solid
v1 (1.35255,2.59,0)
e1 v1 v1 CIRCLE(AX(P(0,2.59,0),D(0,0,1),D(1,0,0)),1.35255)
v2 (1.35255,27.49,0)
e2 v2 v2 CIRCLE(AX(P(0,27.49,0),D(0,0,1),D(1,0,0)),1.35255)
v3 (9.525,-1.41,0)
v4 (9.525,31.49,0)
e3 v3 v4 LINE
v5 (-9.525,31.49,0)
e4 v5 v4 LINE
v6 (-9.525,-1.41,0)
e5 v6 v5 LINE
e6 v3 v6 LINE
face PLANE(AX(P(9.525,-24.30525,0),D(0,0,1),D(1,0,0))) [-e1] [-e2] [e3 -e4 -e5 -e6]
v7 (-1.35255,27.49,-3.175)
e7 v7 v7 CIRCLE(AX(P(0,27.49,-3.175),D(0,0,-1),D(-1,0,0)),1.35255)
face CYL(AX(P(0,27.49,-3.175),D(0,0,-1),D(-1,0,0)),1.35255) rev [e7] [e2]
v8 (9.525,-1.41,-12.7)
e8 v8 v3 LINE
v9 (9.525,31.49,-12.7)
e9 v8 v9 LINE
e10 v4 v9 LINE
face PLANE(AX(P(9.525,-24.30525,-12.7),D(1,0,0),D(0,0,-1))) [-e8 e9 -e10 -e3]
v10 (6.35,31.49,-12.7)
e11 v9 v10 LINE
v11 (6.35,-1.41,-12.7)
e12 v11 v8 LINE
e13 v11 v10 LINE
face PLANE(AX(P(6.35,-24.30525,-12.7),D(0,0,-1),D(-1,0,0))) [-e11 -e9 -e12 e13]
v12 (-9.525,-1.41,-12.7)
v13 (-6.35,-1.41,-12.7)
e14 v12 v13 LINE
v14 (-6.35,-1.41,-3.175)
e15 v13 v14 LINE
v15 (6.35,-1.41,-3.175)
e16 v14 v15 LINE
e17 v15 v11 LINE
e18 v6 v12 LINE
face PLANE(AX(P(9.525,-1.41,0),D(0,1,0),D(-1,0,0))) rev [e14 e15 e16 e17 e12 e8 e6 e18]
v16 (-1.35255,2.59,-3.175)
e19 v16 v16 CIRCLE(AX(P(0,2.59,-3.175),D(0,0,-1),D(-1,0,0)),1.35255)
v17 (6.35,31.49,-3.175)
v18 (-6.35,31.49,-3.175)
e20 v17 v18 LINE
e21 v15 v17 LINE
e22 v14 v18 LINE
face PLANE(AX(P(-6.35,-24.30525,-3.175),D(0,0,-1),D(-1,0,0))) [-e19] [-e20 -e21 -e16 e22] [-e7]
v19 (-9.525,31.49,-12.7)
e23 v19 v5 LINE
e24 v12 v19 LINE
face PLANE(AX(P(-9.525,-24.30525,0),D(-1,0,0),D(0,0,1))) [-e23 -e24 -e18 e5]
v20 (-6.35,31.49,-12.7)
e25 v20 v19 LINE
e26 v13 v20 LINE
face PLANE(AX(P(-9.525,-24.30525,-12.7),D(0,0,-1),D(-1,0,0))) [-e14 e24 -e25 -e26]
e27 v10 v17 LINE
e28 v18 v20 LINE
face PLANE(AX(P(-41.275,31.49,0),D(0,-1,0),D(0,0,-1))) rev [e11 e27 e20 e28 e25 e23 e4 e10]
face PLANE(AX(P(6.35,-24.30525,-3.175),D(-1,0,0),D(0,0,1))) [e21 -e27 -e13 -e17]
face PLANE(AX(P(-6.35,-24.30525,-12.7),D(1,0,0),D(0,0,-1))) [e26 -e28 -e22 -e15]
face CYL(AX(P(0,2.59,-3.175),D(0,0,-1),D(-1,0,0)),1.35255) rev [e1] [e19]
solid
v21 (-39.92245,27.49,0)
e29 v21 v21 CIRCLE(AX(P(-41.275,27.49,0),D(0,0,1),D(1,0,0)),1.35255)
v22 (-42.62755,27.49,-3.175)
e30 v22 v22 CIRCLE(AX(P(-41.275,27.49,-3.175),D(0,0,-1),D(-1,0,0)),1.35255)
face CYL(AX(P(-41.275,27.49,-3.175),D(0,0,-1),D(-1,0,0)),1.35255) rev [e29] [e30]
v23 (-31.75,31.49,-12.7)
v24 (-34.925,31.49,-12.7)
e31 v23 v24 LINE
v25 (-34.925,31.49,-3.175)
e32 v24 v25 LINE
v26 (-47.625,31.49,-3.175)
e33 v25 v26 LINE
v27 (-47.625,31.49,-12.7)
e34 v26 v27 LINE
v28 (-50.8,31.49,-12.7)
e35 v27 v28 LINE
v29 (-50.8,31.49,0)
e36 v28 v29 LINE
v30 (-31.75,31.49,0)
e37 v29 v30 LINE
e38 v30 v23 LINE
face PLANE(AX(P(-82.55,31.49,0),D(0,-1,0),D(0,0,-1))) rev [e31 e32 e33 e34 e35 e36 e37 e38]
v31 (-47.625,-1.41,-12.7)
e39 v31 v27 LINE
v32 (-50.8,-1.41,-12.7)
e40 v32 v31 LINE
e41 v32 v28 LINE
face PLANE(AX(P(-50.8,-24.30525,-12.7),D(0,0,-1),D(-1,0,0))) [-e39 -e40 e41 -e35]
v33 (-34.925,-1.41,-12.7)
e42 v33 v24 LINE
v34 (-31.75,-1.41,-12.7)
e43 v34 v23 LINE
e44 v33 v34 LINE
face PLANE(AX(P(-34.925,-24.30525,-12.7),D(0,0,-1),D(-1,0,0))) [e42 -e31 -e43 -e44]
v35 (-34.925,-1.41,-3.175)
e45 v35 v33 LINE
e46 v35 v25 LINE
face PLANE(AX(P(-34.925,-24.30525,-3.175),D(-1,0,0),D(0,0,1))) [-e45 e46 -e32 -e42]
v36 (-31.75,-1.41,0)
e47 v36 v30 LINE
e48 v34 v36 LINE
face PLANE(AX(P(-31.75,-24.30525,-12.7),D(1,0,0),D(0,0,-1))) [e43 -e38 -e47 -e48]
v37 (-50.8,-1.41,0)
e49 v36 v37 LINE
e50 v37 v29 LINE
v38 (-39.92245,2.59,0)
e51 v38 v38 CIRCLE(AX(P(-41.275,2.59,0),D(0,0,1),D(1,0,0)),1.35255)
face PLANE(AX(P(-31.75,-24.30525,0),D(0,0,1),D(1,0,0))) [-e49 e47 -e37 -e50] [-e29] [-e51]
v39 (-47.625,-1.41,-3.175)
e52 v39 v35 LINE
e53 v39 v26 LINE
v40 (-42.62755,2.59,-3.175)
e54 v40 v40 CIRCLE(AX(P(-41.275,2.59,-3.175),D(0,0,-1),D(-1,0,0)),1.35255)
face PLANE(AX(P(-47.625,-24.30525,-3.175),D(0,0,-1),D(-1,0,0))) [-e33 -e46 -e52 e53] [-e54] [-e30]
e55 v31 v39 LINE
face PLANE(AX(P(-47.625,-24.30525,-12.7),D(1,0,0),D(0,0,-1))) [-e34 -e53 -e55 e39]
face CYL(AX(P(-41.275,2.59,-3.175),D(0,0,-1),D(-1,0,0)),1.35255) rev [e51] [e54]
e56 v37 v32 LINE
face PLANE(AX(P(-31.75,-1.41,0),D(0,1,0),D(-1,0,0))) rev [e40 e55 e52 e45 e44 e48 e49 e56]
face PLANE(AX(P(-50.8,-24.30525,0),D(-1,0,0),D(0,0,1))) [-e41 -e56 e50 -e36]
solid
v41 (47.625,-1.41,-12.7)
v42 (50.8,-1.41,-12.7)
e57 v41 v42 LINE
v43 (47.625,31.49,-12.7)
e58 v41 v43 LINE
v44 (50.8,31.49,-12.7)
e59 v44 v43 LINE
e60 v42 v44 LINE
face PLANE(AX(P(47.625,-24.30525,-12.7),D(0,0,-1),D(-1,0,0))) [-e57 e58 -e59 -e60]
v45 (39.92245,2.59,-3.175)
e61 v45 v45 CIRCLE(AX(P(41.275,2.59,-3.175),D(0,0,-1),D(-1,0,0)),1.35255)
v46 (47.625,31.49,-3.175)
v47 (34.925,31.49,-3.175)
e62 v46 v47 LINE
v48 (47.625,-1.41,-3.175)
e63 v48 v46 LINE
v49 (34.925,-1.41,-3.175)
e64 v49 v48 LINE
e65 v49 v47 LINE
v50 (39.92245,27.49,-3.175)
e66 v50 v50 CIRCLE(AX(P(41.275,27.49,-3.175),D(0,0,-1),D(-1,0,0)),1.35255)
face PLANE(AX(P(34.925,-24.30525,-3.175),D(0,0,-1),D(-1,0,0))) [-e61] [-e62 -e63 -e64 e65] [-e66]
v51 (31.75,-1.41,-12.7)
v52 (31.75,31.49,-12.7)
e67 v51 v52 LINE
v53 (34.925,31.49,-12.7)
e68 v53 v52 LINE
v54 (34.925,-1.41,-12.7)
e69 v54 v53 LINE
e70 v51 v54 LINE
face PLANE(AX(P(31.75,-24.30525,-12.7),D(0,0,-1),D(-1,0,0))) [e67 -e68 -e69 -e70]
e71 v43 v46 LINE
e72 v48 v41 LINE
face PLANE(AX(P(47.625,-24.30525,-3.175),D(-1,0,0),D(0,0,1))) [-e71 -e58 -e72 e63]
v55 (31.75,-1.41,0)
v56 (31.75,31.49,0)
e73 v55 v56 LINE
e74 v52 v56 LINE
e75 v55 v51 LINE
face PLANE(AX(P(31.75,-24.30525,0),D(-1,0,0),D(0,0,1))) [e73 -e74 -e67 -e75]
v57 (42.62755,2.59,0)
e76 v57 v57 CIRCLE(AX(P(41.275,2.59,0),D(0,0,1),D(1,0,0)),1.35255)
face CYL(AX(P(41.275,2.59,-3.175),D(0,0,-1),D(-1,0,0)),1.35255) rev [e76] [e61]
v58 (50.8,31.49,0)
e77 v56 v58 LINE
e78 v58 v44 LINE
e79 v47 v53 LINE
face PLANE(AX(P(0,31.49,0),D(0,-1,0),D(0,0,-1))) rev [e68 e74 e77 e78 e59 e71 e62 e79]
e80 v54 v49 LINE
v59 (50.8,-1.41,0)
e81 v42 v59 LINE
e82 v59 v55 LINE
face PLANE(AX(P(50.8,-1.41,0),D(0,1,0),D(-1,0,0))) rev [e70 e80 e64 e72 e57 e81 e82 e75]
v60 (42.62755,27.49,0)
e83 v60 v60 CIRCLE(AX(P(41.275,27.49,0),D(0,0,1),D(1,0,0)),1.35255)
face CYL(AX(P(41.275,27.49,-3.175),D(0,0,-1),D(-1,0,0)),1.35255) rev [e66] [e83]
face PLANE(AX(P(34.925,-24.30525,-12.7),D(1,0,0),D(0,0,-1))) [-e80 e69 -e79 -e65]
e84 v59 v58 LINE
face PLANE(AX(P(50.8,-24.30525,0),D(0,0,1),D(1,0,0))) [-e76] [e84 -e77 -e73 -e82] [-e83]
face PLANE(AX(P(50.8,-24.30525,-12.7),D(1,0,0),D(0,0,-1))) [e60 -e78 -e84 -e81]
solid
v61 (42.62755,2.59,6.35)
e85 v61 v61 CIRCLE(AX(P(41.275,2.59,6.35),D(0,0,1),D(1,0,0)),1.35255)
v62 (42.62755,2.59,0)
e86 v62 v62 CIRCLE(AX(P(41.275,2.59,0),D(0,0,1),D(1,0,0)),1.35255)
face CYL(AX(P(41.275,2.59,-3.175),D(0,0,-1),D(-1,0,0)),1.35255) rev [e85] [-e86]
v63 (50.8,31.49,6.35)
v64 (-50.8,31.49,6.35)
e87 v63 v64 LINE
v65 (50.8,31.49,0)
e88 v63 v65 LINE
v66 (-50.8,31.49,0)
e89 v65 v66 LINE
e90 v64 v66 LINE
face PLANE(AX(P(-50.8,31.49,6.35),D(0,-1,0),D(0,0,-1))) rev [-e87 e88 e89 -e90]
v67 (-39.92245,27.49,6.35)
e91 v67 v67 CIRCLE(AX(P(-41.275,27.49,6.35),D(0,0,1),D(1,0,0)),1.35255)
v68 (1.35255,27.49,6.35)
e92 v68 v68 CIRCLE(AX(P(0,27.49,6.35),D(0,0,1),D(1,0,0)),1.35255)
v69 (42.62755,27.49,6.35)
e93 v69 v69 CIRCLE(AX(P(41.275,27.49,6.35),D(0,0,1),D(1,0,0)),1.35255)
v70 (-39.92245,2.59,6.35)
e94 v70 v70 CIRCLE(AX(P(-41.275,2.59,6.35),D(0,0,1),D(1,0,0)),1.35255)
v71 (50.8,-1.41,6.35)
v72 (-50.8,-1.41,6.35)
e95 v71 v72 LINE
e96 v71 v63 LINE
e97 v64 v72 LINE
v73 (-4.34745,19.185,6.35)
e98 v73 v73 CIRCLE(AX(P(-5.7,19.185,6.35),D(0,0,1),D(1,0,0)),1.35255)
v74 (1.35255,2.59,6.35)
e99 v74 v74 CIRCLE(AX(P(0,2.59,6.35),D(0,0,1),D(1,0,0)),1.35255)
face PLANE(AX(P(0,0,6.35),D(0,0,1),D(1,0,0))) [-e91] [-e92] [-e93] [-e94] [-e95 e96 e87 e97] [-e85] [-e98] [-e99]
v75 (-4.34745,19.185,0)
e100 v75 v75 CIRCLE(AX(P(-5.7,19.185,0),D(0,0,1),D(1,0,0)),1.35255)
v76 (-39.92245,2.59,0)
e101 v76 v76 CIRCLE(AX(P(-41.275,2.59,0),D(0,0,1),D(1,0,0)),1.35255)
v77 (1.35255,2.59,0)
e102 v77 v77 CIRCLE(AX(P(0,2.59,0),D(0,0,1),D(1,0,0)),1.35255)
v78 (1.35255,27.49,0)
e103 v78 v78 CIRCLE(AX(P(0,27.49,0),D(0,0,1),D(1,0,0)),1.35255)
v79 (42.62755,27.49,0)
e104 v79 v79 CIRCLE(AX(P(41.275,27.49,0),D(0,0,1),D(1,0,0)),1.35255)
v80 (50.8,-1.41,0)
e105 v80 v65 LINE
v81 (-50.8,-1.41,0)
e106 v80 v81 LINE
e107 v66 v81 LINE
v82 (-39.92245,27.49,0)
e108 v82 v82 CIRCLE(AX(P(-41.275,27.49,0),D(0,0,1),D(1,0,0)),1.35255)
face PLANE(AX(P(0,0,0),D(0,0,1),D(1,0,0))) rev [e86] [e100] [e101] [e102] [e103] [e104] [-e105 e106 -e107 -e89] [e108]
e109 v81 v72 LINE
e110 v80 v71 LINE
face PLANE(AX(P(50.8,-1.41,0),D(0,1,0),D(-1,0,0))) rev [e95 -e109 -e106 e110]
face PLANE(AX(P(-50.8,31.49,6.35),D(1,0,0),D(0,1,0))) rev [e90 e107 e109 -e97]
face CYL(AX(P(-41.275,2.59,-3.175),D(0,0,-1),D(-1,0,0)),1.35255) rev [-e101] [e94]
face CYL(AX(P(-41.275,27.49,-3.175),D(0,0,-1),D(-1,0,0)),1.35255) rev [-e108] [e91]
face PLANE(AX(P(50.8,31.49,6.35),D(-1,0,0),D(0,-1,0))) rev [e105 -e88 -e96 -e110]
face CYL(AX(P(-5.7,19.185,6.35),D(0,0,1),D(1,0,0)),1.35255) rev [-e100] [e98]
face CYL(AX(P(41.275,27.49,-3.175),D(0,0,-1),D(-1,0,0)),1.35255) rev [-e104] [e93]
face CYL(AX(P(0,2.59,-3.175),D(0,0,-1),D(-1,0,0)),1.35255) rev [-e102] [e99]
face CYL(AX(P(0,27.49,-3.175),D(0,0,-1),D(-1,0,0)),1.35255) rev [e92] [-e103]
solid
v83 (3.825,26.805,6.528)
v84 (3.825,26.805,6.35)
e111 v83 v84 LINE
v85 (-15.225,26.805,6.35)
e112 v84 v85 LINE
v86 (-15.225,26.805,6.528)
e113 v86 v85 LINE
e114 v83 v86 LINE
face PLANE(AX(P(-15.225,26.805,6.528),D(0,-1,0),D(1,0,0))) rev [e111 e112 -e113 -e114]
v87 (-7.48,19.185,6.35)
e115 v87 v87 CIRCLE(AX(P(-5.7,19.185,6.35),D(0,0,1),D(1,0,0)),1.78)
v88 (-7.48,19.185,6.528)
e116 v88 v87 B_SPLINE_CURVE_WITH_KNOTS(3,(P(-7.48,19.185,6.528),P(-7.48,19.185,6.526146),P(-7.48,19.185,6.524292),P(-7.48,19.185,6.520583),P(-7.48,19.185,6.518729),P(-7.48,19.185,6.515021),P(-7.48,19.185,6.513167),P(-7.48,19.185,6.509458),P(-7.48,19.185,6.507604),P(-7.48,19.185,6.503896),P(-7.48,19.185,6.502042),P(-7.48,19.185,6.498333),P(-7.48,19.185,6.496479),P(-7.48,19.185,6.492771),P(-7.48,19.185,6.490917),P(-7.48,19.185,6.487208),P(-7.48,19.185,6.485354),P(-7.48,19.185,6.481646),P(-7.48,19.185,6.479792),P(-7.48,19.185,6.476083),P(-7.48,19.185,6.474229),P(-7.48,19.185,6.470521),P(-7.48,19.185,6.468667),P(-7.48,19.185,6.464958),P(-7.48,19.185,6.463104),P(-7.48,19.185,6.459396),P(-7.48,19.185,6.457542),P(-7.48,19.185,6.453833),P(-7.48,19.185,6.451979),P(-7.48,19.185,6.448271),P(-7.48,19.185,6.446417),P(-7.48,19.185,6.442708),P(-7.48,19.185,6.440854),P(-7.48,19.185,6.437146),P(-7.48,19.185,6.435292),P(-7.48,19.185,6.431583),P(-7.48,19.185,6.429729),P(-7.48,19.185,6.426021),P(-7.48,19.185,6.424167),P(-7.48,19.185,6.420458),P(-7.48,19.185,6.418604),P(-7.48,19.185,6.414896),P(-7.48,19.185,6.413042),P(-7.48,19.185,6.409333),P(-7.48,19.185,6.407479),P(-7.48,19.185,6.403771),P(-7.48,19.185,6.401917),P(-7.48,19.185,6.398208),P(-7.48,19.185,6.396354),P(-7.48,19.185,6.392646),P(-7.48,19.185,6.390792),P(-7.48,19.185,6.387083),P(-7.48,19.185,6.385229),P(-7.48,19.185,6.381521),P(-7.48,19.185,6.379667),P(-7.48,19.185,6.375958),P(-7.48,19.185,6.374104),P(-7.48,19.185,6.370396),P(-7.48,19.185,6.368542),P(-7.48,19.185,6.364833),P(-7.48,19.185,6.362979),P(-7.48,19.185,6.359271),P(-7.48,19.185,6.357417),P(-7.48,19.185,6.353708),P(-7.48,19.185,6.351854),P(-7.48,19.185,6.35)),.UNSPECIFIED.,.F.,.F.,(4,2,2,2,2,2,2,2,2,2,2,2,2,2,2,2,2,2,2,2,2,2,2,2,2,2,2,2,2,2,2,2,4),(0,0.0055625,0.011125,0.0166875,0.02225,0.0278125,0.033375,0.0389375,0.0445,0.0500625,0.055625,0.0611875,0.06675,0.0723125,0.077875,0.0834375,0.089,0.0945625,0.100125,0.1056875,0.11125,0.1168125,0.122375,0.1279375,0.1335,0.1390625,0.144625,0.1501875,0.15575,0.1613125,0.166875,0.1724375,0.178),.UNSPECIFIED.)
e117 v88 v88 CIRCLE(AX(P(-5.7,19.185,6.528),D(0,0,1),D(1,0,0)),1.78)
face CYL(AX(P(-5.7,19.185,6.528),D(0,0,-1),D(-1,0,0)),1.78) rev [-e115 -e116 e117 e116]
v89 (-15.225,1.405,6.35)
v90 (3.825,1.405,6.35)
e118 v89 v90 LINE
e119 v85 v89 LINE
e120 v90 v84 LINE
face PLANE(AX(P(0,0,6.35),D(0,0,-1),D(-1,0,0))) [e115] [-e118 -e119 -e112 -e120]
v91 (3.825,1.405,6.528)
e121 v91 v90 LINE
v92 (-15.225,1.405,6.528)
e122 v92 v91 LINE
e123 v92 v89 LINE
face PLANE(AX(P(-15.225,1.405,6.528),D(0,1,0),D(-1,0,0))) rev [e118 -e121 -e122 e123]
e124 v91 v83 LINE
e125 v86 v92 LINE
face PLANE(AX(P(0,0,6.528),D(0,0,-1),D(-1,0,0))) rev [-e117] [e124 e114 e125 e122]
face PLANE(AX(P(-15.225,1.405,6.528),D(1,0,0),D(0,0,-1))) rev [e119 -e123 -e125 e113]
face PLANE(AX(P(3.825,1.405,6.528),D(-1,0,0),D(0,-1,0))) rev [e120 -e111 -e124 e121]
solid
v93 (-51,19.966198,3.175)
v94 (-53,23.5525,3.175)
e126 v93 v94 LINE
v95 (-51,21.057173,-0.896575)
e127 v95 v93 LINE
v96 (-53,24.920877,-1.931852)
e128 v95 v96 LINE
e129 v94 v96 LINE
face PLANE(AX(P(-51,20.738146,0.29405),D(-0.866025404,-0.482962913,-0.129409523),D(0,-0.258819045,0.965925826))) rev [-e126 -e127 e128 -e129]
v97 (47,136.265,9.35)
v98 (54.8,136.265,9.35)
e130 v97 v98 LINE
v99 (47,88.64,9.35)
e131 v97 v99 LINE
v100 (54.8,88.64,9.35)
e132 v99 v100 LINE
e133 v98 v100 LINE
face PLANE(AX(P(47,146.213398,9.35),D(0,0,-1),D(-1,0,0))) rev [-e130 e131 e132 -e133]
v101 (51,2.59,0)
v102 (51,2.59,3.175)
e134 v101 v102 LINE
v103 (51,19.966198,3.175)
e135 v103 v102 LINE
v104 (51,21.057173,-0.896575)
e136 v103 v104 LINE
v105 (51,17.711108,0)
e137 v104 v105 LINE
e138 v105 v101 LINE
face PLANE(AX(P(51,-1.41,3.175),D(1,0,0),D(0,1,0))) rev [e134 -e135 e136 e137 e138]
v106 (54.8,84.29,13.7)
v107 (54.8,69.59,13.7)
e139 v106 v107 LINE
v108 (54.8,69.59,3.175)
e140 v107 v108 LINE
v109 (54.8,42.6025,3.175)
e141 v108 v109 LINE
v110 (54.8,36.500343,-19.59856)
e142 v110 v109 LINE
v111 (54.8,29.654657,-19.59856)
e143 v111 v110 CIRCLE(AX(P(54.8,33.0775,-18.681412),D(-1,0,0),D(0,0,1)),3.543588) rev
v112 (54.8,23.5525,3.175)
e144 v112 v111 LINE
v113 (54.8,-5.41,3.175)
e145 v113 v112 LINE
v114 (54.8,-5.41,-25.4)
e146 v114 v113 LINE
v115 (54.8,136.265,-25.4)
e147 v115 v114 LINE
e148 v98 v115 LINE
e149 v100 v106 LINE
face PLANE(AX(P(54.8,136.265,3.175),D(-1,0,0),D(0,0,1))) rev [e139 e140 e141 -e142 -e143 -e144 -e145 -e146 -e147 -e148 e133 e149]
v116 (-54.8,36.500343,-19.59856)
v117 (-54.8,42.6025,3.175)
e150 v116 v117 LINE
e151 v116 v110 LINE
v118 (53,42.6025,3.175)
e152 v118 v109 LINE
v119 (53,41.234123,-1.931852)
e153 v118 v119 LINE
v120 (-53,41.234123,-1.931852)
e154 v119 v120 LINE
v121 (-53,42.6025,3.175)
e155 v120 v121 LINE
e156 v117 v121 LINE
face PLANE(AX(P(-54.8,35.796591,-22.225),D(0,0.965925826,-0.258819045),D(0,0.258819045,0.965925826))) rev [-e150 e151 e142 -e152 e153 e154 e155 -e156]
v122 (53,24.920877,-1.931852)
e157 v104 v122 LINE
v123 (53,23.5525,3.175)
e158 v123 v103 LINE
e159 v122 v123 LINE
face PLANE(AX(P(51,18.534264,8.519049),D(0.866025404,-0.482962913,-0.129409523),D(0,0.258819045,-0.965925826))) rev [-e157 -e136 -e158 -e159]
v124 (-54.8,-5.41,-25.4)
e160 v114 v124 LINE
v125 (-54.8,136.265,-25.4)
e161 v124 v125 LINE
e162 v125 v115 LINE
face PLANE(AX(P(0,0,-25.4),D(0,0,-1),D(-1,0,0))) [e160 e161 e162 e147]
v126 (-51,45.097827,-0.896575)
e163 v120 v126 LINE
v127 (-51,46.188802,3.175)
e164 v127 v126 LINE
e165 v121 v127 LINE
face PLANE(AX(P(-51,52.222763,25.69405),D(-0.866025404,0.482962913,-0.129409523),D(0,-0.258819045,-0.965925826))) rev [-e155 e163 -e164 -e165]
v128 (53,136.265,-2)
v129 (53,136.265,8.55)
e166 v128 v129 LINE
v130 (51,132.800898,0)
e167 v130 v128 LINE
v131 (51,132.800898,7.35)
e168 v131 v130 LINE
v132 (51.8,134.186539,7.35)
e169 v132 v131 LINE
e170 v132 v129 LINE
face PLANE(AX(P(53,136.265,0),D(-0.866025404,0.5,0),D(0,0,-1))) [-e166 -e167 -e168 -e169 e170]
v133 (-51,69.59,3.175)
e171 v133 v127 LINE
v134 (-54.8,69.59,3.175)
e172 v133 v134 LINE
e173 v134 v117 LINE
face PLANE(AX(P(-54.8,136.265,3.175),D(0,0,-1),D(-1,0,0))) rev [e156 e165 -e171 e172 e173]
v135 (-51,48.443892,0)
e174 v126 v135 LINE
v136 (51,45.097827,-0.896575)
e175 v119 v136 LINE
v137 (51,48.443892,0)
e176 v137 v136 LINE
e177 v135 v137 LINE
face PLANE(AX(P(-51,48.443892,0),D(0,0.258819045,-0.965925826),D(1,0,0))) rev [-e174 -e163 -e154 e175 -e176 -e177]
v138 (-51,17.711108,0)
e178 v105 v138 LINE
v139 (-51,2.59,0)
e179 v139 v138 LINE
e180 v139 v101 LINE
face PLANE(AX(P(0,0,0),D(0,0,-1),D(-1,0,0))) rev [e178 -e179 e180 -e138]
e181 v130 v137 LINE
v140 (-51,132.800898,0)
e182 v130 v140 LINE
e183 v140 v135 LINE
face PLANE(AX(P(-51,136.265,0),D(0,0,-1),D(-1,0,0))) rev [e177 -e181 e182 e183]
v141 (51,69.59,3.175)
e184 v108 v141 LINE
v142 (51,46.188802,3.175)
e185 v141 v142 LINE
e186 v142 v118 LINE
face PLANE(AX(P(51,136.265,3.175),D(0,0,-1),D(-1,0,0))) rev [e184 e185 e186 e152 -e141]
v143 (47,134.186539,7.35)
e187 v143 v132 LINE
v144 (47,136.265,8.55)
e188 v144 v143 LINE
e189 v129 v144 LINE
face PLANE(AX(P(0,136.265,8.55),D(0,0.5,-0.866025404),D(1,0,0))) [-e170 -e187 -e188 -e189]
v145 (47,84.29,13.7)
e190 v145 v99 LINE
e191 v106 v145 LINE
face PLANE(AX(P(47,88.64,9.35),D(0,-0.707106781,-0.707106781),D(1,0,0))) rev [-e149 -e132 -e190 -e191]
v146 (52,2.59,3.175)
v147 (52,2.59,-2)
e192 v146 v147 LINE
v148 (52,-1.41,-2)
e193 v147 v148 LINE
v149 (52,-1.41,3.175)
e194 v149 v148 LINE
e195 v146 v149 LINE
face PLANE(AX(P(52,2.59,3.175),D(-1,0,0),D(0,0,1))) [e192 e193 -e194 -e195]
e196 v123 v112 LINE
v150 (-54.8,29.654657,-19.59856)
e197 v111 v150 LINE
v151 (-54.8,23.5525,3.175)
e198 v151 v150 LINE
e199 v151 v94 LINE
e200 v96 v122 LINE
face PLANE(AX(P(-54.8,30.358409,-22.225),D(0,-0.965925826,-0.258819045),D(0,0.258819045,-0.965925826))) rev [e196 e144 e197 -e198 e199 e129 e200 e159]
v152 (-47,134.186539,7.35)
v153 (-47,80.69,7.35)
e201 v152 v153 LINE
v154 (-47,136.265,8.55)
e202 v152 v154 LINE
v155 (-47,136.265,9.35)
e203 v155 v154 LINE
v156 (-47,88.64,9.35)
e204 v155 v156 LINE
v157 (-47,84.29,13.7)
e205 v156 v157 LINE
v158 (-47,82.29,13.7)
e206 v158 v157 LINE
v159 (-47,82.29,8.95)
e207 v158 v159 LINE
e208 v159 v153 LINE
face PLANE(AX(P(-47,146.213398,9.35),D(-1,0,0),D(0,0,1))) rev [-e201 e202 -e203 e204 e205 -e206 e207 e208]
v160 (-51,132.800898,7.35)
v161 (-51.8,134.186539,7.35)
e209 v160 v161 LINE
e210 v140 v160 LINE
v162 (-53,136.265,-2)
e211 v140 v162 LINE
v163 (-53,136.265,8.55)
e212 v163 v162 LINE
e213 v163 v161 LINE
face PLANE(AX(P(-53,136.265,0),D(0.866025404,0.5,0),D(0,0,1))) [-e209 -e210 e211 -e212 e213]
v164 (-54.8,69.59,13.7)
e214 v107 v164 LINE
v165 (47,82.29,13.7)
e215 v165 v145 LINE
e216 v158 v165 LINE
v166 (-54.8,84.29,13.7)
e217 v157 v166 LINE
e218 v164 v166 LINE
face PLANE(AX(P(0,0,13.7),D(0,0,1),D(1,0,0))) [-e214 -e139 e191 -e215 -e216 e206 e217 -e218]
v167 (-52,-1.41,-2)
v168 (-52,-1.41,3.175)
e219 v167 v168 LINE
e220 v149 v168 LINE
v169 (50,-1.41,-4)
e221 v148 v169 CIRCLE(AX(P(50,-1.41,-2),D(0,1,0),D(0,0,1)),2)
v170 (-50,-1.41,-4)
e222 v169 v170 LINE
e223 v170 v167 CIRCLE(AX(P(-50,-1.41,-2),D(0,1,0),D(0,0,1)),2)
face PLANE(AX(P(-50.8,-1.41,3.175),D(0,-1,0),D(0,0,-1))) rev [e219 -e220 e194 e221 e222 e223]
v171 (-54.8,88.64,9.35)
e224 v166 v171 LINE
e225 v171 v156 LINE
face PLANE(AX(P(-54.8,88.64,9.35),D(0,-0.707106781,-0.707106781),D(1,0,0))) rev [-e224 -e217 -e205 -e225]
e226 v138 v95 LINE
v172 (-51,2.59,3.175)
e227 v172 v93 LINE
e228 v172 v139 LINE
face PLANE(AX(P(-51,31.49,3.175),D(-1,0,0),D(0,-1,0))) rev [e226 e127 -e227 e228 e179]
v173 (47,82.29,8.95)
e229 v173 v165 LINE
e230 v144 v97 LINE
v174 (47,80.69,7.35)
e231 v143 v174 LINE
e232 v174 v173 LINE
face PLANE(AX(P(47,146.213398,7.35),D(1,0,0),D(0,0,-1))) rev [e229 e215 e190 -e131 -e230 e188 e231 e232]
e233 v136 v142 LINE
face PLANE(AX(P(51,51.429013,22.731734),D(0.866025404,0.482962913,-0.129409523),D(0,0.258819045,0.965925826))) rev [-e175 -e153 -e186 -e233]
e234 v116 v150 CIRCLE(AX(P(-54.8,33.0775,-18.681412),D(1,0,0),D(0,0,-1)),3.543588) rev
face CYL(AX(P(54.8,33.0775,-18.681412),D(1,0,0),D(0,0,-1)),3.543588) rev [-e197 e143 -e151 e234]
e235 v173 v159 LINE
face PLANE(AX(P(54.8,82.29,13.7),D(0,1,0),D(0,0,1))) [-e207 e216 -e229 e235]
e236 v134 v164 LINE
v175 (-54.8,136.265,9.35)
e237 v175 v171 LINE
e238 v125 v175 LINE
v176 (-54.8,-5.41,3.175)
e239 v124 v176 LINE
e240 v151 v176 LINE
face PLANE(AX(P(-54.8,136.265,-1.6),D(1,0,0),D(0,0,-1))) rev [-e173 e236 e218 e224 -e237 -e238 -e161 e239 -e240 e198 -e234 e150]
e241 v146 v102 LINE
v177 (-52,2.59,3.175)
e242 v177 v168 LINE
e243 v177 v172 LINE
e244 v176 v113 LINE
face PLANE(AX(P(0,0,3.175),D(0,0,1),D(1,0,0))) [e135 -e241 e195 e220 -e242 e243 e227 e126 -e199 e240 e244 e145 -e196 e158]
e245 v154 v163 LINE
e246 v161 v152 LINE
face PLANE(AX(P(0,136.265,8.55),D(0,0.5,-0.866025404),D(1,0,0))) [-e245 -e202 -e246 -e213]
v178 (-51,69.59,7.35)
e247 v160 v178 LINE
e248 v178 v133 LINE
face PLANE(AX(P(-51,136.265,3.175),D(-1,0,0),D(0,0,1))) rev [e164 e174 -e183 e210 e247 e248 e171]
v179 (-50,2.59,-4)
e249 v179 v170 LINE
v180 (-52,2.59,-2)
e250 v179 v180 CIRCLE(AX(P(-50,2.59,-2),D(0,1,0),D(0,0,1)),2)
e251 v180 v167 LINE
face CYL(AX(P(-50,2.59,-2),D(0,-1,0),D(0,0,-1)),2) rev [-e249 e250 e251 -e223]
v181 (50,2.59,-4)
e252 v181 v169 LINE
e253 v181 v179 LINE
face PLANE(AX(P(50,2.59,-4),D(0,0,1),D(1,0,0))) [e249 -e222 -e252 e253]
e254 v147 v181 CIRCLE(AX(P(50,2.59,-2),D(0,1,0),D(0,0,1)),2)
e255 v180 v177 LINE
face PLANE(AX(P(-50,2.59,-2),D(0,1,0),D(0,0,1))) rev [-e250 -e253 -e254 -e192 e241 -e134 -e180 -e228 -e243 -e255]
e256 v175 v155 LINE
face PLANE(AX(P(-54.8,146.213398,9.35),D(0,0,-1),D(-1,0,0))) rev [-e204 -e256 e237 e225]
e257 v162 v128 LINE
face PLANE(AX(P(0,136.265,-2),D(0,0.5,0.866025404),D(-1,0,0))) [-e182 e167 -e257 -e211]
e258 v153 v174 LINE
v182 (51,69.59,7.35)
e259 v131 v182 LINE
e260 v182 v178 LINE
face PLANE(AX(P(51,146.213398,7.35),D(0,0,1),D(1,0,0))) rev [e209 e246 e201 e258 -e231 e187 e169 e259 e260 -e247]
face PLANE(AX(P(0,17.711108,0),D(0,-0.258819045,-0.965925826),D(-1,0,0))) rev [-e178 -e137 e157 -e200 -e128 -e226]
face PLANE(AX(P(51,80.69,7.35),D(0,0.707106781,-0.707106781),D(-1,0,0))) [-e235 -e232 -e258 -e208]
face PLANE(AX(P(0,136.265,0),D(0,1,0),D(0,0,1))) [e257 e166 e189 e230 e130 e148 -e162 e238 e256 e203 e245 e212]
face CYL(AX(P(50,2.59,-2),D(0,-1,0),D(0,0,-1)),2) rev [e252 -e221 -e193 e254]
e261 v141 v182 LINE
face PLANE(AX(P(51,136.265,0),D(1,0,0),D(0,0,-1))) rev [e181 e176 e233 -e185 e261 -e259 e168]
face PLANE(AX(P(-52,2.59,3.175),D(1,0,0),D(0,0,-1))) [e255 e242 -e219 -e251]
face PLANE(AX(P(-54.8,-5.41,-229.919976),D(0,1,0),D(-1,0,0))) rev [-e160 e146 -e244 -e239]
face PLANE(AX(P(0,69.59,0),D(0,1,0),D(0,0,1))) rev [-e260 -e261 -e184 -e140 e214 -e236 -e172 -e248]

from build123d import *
from OCP.BRepFilletAPI import BRepFilletAPI_MakeChamfer

# Parameters (mm, degrees)
SKETCH1_W                          = 101.6
SKETCH1_H                          = 35.999999882
BOSS_EXTRUDE1_DEPTH                = 6.35
TAP_DRILL_FOR_6_32_TAP2_D          = 2.7051
SKETCH5_W                          = 16.399999966
SKETCH5_H                          = 3.000000096
CUT_EXTRUDE1_DEPTH                 = 61.104763545
MOVE_FACE1_BY                      = 0.100000054
MOVE_FACE1_2_BY                    = 0.100000054
MOVE_FACE1_3_BY                    = 0.100000054
MOVE_FACE1_4_BY                    = 0.100000054
SKETCH4_W                          = 19.05
SKETCH4_H                          = 25.4
SKETCH4_R                          = 1.78
BOSS_EXTRUDE2_DEPTH                = 0.178
BOSS_EXTRUDE3_DEPTH                = 32.899999732
LPATTERN1_COUNT                    = 3
LPATTERN1_PITCH                    = 41.275
SKETCH7_W                          = 101.6
SKETCH7_H                          = 3.10000015
CUT_EXTRUDE2_DEPTH                 = 63.730874382
SKETCH9_W                          = 1.35255
SKETCH9_H                          = 9.703
TAP_DRILL_FOR_6_32_TAP3_AT_2_COUNT = 2
TAP_DRILL_FOR_6_32_TAP3_AT_2_PITCH = 24.899999476
TAP_DRILL_FOR_6_32_TAP3_AT_3_COUNT = 2
TAP_DRILL_FOR_6_32_TAP3_AT_3_PITCH = 41.275
TAP_DRILL_FOR_6_32_TAP3_AT_4_COUNT = 2
TAP_DRILL_FOR_6_32_TAP3_AT_4_PITCH = 48.204103548
TAP_DRILL_FOR_6_32_TAP3_AT_5_COUNT = 2
TAP_DRILL_FOR_6_32_TAP3_AT_5_PITCH = 82.55
TAP_DRILL_FOR_6_32_TAP3_AT_6_COUNT = 2
TAP_DRILL_FOR_6_32_TAP3_AT_6_PITCH = 86.223619003
SKETCH15_W                         = 109.600000256
SKETCH15_H                         = 36.89999986
BOSS_EXTRUDE6_DEPTH                = 1.600000102
BOSS_EXTRUDE7_DEPTH                = 3.175
MOVE_FACE3_BY                      = 0.200000108
MOVE_FACE3_2_BY                    = 0.200000108
BOSS_EXTRUDE8_DEPTH                = 101.6
SKETCH18_W                         = 109.600000256
SKETCH18_H                         = 141.67499986
BOSS_EXTRUDE9_DEPTH                = 23.799999898
CUT_EXTRUDE5_DEPTH                 = 177.707301163
FILLET1_R                          = 3.543588
BOSS_EXTRUDE10_DEPTH               = 66.675
SKETCH21_W                         = 109.600000256
SKETCH21_H                         = 12.7
BOSS_EXTRUDE11_DEPTH               = 6.35
CHAMFER2_SIZE                      = 1.6
CHAMFER4_SIZE                      = 2
CHAMFER4_SIZE2                     = 3.464101615
CHAMFER4_SIZE2_2                   = 6.69213043
CHAMFER5_SIZE                      = 2
CHAMFER5_SIZE2                     = 3.464101615
CHAMFER6_SIZE                      = 1.2
CHAMFER6_SIZE2                     = 2.078460969
CHAMFER7_SIZE                      = 6.35
CUT_EXTRUDE6_DEPTH                 = 4.000000128


# Some blends are built 0.0001 mm under size
with BuildPart() as part:
    # Sketch1 → Boss-Extrude1 (new body)
    with BuildSketch(Plane.XY):
        with Locations((0, 13.490000071)):
            Rectangle(SKETCH1_W, SKETCH1_H)
    extrude(amount=BOSS_EXTRUDE1_DEPTH)

    # Tap Drill for #6-32 Tap2 (through all)
    with Locations(Plane.XY.offset(6.35)):
        with Locations((-5.70000003, 19.184999984)):
            Hole(TAP_DRILL_FOR_6_32_TAP2_D / 2)

    # Sketch5 → Cut-Extrude1 (cut, through all)
    with BuildSketch(Plane.XY.offset(6.35)):
        with Locations((42.600000017, -3.009999822)):
            Rectangle(SKETCH5_W, SKETCH5_H)
        with Locations((-42.600000017, -3.009999822)):
            Rectangle(SKETCH5_W, SKETCH5_H)
    extrude(amount=-CUT_EXTRUDE1_DEPTH, mode=Mode.SUBTRACT)

    # Move Face1: a face moved inward by 0.1
    extrude(part.faces().sort_by_distance((-42.600000017, -1.509999774, 3.175))[0], amount=MOVE_FACE1_BY, dir=(0, 1, 0), mode=Mode.SUBTRACT)

    # Move Face1 2: a face moved inward by 0.1
    extrude(part.faces().sort_by_distance((-34.400000034, -3.009999822, 3.175))[0], amount=MOVE_FACE1_2_BY, dir=(1, 0, 0), mode=Mode.SUBTRACT)

    # Move Face1 3: a face moved inward by 0.1
    extrude(part.faces().sort_by_distance((34.400000034, -3.009999822, 3.175))[0], amount=MOVE_FACE1_3_BY, dir=(-1, 0, 0), mode=Mode.SUBTRACT)

    # Move Face1 4: a face moved inward by 0.1
    extrude(part.faces().sort_by_distance((42.600000017, -1.509999774, 3.175))[0], amount=MOVE_FACE1_4_BY, dir=(0, 1, 0), mode=Mode.SUBTRACT)

    # Sketch7 → Cut-Extrude2 (cut, through all)
    with BuildSketch(Plane.XY.offset(6.35)):
        with Locations((0, -2.959999795)):
            Rectangle(SKETCH7_W, SKETCH7_H)
    extrude(amount=-CUT_EXTRUDE2_DEPTH, mode=Mode.SUBTRACT)


with BuildPart() as body_2:
    # Sketch4 → Boss-Extrude2 (new body)
    with BuildSketch(Plane.XY.offset(6.35)):
        with Locations((-5.70000003, 14.104999984)):
            Rectangle(SKETCH4_W, SKETCH4_H)
        with Locations(Location((-5.70000003, 19.184999984, 0), (0, 0, 180))):
            Circle(SKETCH4_R, mode=Mode.SUBTRACT)
    extrude(amount=BOSS_EXTRUDE2_DEPTH)


with BuildPart() as body_3:
    # Sketch6 → Boss-Extrude3 (new body)
    with BuildSketch(Plane(origin=(0, 31.490000012, 0), x_dir=(1, 0, 0), z_dir=(0, 1, 0))):
        Polygon((50.8, 12.7), (50.8, 0), (31.75, 0), (31.75, 12.7), (34.925, 12.7), (34.925, 3.175), (47.625, 3.175), (47.625, 12.7), align=None)
    extrude(amount=-BOSS_EXTRUDE3_DEPTH)


with BuildPart() as lpattern1_1:
    # LPattern1: pattern copy
    add(body_3.part.moved(Location(Vector(-1, 0, 0) * (1 * LPATTERN1_PITCH))))


with BuildPart() as lpattern1_2:
    # LPattern1: pattern copy
    add(body_3.part.moved(Location(Vector(-1, 0, 0) * (2 * LPATTERN1_PITCH))))


with BuildPart() as tap_drill_for_6_32_tap3_tool:
    # Sketch9 → Tap Drill for #6-32 Tap3 (revolve)
    with BuildSketch(Plane(origin=(41.275, 27.489999884, -3.175), x_dir=(0, 1, 0), z_dir=(1, 0, 0))):
        with Locations((0.676275, 4.8515)):
            Rectangle(SKETCH9_W, SKETCH9_H)
    tap_drill_for_6_32_tap3 = revolve(axis=Axis((41.275, 27.489999884, -9.525), (0, 0, 1)))


with BuildPart() as part_1:
    add(part.part)

    # Tap Drill for #6-32 Tap3: cut by tap_drill_for_6_32_tap3_tool
    add(tap_drill_for_6_32_tap3_tool.part, mode=Mode.SUBTRACT)


with BuildPart() as body_3_1:
    add(body_3.part)

    # Tap Drill for #6-32 Tap3: cut by tap_drill_for_6_32_tap3_tool
    add(tap_drill_for_6_32_tap3_tool.part, mode=Mode.SUBTRACT)


with BuildPart() as tap_drill_for_6_32_tap3_at_2_tool:
    # Tap Drill for #6-32 Tap3 at 2: Tap Drill for #6-32 Tap3 ×2
    with Locations(*[(0, -i * TAP_DRILL_FOR_6_32_TAP3_AT_2_PITCH, 0) for i in range(1, TAP_DRILL_FOR_6_32_TAP3_AT_2_COUNT)]):
        add(tap_drill_for_6_32_tap3)


with BuildPart() as part_2:
    add(part_1.part)

    # Tap Drill for #6-32 Tap3 at 2: cut by tap_drill_for_6_32_tap3_at_2_tool
    add(tap_drill_for_6_32_tap3_at_2_tool.part, mode=Mode.SUBTRACT)


with BuildPart() as body_3_2:
    add(body_3_1.part)

    # Tap Drill for #6-32 Tap3 at 2: cut by tap_drill_for_6_32_tap3_at_2_tool
    add(tap_drill_for_6_32_tap3_at_2_tool.part, mode=Mode.SUBTRACT)


with BuildPart() as tap_drill_for_6_32_tap3_at_3_tool:
    # Tap Drill for #6-32 Tap3 at 3: Tap Drill for #6-32 Tap3 ×2
    with Locations(*[(-i * TAP_DRILL_FOR_6_32_TAP3_AT_3_PITCH, 0, 0) for i in range(1, TAP_DRILL_FOR_6_32_TAP3_AT_3_COUNT)]):
        add(tap_drill_for_6_32_tap3)


with BuildPart() as part_3:
    add(part_2.part)

    # Tap Drill for #6-32 Tap3 at 3: cut by tap_drill_for_6_32_tap3_at_3_tool
    add(tap_drill_for_6_32_tap3_at_3_tool.part, mode=Mode.SUBTRACT)


with BuildPart() as lpattern1_1_1:
    add(lpattern1_1.part)

    # Tap Drill for #6-32 Tap3 at 3: cut by tap_drill_for_6_32_tap3_at_3_tool
    add(tap_drill_for_6_32_tap3_at_3_tool.part, mode=Mode.SUBTRACT)


with BuildPart() as tap_drill_for_6_32_tap3_at_4_tool:
    # Tap Drill for #6-32 Tap3 at 4: Tap Drill for #6-32 Tap3 ×2
    with Locations(*[Vector(-0.8562549028332803, -0.5165535222742845, 0) * (i * TAP_DRILL_FOR_6_32_TAP3_AT_4_PITCH) for i in range(1, TAP_DRILL_FOR_6_32_TAP3_AT_4_COUNT)]):
        add(tap_drill_for_6_32_tap3)


with BuildPart() as part_4:
    add(part_3.part)

    # Tap Drill for #6-32 Tap3 at 4: cut by tap_drill_for_6_32_tap3_at_4_tool
    add(tap_drill_for_6_32_tap3_at_4_tool.part, mode=Mode.SUBTRACT)


with BuildPart() as lpattern1_1_2:
    add(lpattern1_1_1.part)

    # Tap Drill for #6-32 Tap3 at 4: cut by tap_drill_for_6_32_tap3_at_4_tool
    add(tap_drill_for_6_32_tap3_at_4_tool.part, mode=Mode.SUBTRACT)


with BuildPart() as tap_drill_for_6_32_tap3_at_5_tool:
    # Tap Drill for #6-32 Tap3 at 5: Tap Drill for #6-32 Tap3 ×2
    with Locations(*[(-i * TAP_DRILL_FOR_6_32_TAP3_AT_5_PITCH, 0, 0) for i in range(1, TAP_DRILL_FOR_6_32_TAP3_AT_5_COUNT)]):
        add(tap_drill_for_6_32_tap3)


with BuildPart() as part_5:
    add(part_4.part)

    # Tap Drill for #6-32 Tap3 at 5: cut by tap_drill_for_6_32_tap3_at_5_tool
    add(tap_drill_for_6_32_tap3_at_5_tool.part, mode=Mode.SUBTRACT)


with BuildPart() as lpattern1_2_1:
    add(lpattern1_2.part)

    # Tap Drill for #6-32 Tap3 at 5: cut by tap_drill_for_6_32_tap3_at_5_tool
    add(tap_drill_for_6_32_tap3_at_5_tool.part, mode=Mode.SUBTRACT)


with BuildPart() as tap_drill_for_6_32_tap3_at_6_tool:
    # Tap Drill for #6-32 Tap3 at 6: Tap Drill for #6-32 Tap3 ×2
    with Locations(*[Vector(-0.9573942842449561, -0.28878397548182655, 0) * (i * TAP_DRILL_FOR_6_32_TAP3_AT_6_PITCH) for i in range(1, TAP_DRILL_FOR_6_32_TAP3_AT_6_COUNT)]):
        add(tap_drill_for_6_32_tap3)


with BuildPart() as part_6:
    add(part_5.part)

    # Tap Drill for #6-32 Tap3 at 6: cut by tap_drill_for_6_32_tap3_at_6_tool
    add(tap_drill_for_6_32_tap3_at_6_tool.part, mode=Mode.SUBTRACT)


with BuildPart() as lpattern1_2_2:
    add(lpattern1_2_1.part)

    # Tap Drill for #6-32 Tap3 at 6: cut by tap_drill_for_6_32_tap3_at_6_tool
    add(tap_drill_for_6_32_tap3_at_6_tool.part, mode=Mode.SUBTRACT)


with BuildPart() as body_6:
    # Sketch15 → Boss-Extrude6 (new body)
    with BuildSketch(Plane(origin=(0, 0, 0), x_dir=(-1, 0, 0), z_dir=(0, 0, -1))):
        with Locations((0, 13.040000082)):
            Rectangle(SKETCH15_W, SKETCH15_H)
    extrude(amount=BOSS_EXTRUDE6_DEPTH)

    # Sketch16 → Boss-Extrude7 (add)
    with BuildSketch(Plane.XY):
        Polygon((-50.8, 31.490000012), (-50.8, -1.40999972), (50.8, -1.40999972), (50.8, 31.490000012), (54.800000128, 31.490000012), (54.800000128, -5.409999848), (-54.800000128, -5.409999848), (-54.800000128, 31.490000012), align=None)
    extrude(amount=BOSS_EXTRUDE7_DEPTH)

    # Move Face3: a face moved inward by 0.2
    extrude(body_6.faces().sort_by_distance((50.8, 15.040000146, 1.5875))[0], amount=MOVE_FACE3_BY, dir=(1, 0, 0), mode=Mode.SUBTRACT)

    # Move Face3 2: a face moved inward by 0.2
    extrude(body_6.faces().sort_by_distance((-50.8, 15.040000146, 1.5875))[0], amount=MOVE_FACE3_2_BY, dir=(-1, 0, 0), mode=Mode.SUBTRACT)


with BuildPart() as body_7:
    # Sketch17 → Boss-Extrude8 (new body)
    with BuildSketch(Plane(origin=(0, 34.665000012, 0), x_dir=(1, 0, 0), z_dir=(0, 1, 0))):
        Polygon((54.800000128, -3.175), (54.800000128, 1.600000102), (-54.800000128, 1.600000102), (-54.800000128, -3.175), (-51.000000108, -3.175), (-51.000000108, 0), (51.000000108, 0), (51.000000108, -3.175), align=None)
    extrude(amount=BOSS_EXTRUDE8_DEPTH)


    add(body_6.part)  # Boss-Extrude9 merges body 6
    # Sketch18 → Boss-Extrude9 (add)
    with BuildSketch(Plane(origin=(0, 0, -1.600000102), x_dir=(-1, 0, 0), z_dir=(0, 0, -1))):
        with Locations((0, 65.427500082)):
            Rectangle(SKETCH18_W, SKETCH18_H)
    extrude(amount=BOSS_EXTRUDE9_DEPTH)

    # Sketch19 → Cut-Extrude5 (cut, through all)
    with BuildSketch(Plane(origin=(54.800000128, 0, 0), x_dir=(0, 0, -1), z_dir=(1, 0, 0))):
        Polygon((22.225, 35.796590524), (-3.175, 42.602500012), (-3.175, 23.552500012), (22.225, 30.3584095), align=None)
    extrude(amount=-CUT_EXTRUDE5_DEPTH, mode=Mode.SUBTRACT)

    # Fillet1
    fillet1_edges = [body_7.edges().sort_by_distance(p)[0] for p in [
        (0, 30.3584095, -22.225),
        (0, 35.796590524, -22.225),
    ]]
    fillet(fillet1_edges, radius=FILLET1_R - 0.0001)  # a hair under: the kernel refuses the full size

    # Sketch20 → Boss-Extrude10 (add)
    with BuildSketch(Plane(origin=(0, 69.590000012, 0), x_dir=(1, 0, 0), z_dir=(0, 1, 0))):
        Polygon((46.99999998, -9.350000096), (54.800000128, -9.350000096), (54.800000128, -3.175), (51.000000108, -3.175), (51.000000108, -7.350000032), (46.99999998, -7.350000032), align=None)
        Polygon((-54.800000128, -3.175), (-54.800000128, -9.350000096), (-46.99999998, -9.350000096), (-46.99999998, -7.350000032), (-51.000000108, -7.350000032), (-51.000000108, -3.175), align=None)
    extrude(amount=BOSS_EXTRUDE10_DEPTH)

    # Sketch21 → Boss-Extrude11 (add)
    with BuildSketch(Plane(origin=(0, 0, 7.350000032), x_dir=(-1, 0, 0), z_dir=(0, 0, -1))):
        with Locations((0, 75.940000012)):
            Rectangle(SKETCH21_W, SKETCH21_H)
    extrude(amount=-BOSS_EXTRUDE11_DEPTH)

    # Chamfer2
    chamfer2_edges = [body_7.edges().sort_by_distance(p)[0] for p in [
        (0, 82.290000012, 7.350000032),
    ]]
    chamfer(chamfer2_edges, length=CHAMFER2_SIZE)

    # Chamfer4: one chamfer whose edges measure the first distance from different faces: ONE call of the kernel's chamfer builder (chamfer() names one face for all edges)
    chamfer4_edges_1 = [body_7.edges().sort_by_distance(p)[0] for p in [
        (51.000000108, 42.177130669, 1.5875),
        (-51.000000108, 42.177130669, 1.5875),
    ]]
    chamfer4_side_1 = [body_7.faces().sort_by_distance(p)[0] for p in [
        (0, 39.159936336, -9.672822546),
    ]]
    chamfer4_edges_2 = [body_7.edges().sort_by_distance(p)[0] for p in [
        (0, 41.751761326, 0),
    ]]
    chamfer4_side_2 = [body_7.faces().sort_by_distance(p)[0] for p in [
        (0, 39.159936336, -9.672822546),
    ]]
    chamfer4_edges_3 = [body_7.edges().sort_by_distance(p)[0] for p in [
        (51.000000108, 23.977869355, 1.5875),
        (-51.000000108, 23.977869355, 1.5875),
    ]]
    chamfer4_side_3 = [body_7.faces().sort_by_distance(p)[0] for p in [
        (0, 26.995063688, -9.672822546),
    ]]
    chamfer4_edges_4 = [body_7.edges().sort_by_distance(p)[0] for p in [
        (0, 24.403238698, 0),
    ]]
    chamfer4_side_4 = [body_7.faces().sort_by_distance(p)[0] for p in [
        (0, 26.995063688, -9.672822546),
    ]]
    chamfer4 = BRepFilletAPI_MakeChamfer(body_7.part.solid().wrapped)
    for e in chamfer4_edges_1:
        chamfer4.Add(CHAMFER4_SIZE, CHAMFER4_SIZE2, e.wrapped, chamfer4_side_1[0].wrapped)  # the first distance lies on this face
    for e in chamfer4_edges_2:
        chamfer4.Add(CHAMFER4_SIZE, CHAMFER4_SIZE2_2, e.wrapped, chamfer4_side_2[0].wrapped)  # the first distance lies on this face
    for e in chamfer4_edges_3:
        chamfer4.Add(CHAMFER4_SIZE, CHAMFER4_SIZE2, e.wrapped, chamfer4_side_3[0].wrapped)  # the first distance lies on this face
    for e in chamfer4_edges_4:
        chamfer4.Add(CHAMFER4_SIZE, CHAMFER4_SIZE2_2, e.wrapped, chamfer4_side_4[0].wrapped)  # the first distance lies on this face
    add(Compound.cast(chamfer4.Shape()), mode=Mode.REPLACE)

    # Chamfer5
    chamfer5_edges = [body_7.edges().sort_by_distance(p)[0] for p in [
        (-51.000000108, 136.265000012, 3.675000016),
        (0, 136.265000012, 0),
        (51.000000108, 136.265000012, 3.675000016),
    ]]
    chamfer5_side = [body_7.faces().sort_by_distance(p)[0] for p in [
        (0, 136.265000012, -12.152621986),
    ]]
    chamfer(chamfer5_edges, length=CHAMFER5_SIZE, length2=CHAMFER5_SIZE2, reference=chamfer5_side[0])

    # Chamfer6
    chamfer6_edges = [body_7.edges().sort_by_distance(p)[0] for p in [
        (50.000000044, 136.265000012, 7.350000032),
        (-50.000000044, 136.265000012, 7.350000032),
    ]]
    chamfer6_side = [body_7.faces().sort_by_distance(p)[0] for p in [
        (0, 136.265000012, -13.228753549),
    ]]
    chamfer(chamfer6_edges, length=CHAMFER6_SIZE, length2=CHAMFER6_SIZE2, reference=chamfer6_side[0])

    # Chamfer7
    # the kernel refuses this chamfer: 6.35 mm, written as the material it adds along each edge
    with BuildSketch(Plane(origin=(-54.800000128, 82.290000012, 9.350000096), x_dir=(0, -0.027495876610585654, 0.9996219169112968), z_dir=(1, 0, 0))) as chamfer7_piece_1_section:
        Polygon((CHAMFER7_SIZE * 0.999621916911, -CHAMFER7_SIZE * 0.0274958766106), (-CHAMFER7_SIZE * 0.0274958766106, -CHAMFER7_SIZE * 0.999621916911), (0, 0), align=None)
    chamfer7_piece_1 = extrude(amount=7.800000148, mode=Mode.PRIVATE)
    chamfer7_piece_1 = split(chamfer7_piece_1, bisect_by=Plane(origin=(-50.900000054, 84.583638533, 13.700000032), z_dir=(0, 0, -1)), keep=Keep.TOP, mode=Mode.PRIVATE)
    add(chamfer7_piece_1)
    with BuildSketch(Plane(origin=(46.99999998, 82.290000012, 9.350000096), x_dir=(0, -0.027495876610585654, 0.9996219169112968), z_dir=(1, 0, 0))) as chamfer7_piece_2_section:
        Polygon((CHAMFER7_SIZE * 0.999621916911, -CHAMFER7_SIZE * 0.0274958766106), (-CHAMFER7_SIZE * 0.0274958766106, -CHAMFER7_SIZE * 0.999621916911), (0, 0), align=None)
    chamfer7_piece_2 = extrude(amount=7.800000148, mode=Mode.PRIVATE)
    chamfer7_piece_2 = split(chamfer7_piece_2, bisect_by=Plane(origin=(50.900000054, 84.583638533, 13.700000032), z_dir=(0, 0, -1)), keep=Keep.TOP, mode=Mode.PRIVATE)
    add(chamfer7_piece_2)

    # Sketch22 → Cut-Extrude6 (cut)
    with BuildSketch(Plane(origin=(0, -1.40999972, 0), x_dir=(1, 0, 0), z_dir=(0, 1, 0))):
        with BuildLine():
            Line((-52.00000014, -3.175), (52.00000014, -3.175))
            Line((52.00000014, -3.175), (52.00000014, 2.000000064))
            ThreePointArc((52.00000014, 2.000000064), (51.414213684, 3.414213672), (50.000000076, 4.000000128))
            Line((50.000000076, 4.000000128), (-50.000000076, 4.000000128))
            ThreePointArc((-50.000000076, 4.000000128), (-51.414213684, 3.414213672), (-52.00000014, 2.000000064))
            Line((-52.00000014, 2.000000064), (-52.00000014, -3.175))
        make_face()
    extrude(amount=CUT_EXTRUDE6_DEPTH, mode=Mode.SUBTRACT)


solid = Compound([body_2.part, body_3_2.part, lpattern1_1_2.part, part_6.part, lpattern1_2_2.part, body_7.part])
